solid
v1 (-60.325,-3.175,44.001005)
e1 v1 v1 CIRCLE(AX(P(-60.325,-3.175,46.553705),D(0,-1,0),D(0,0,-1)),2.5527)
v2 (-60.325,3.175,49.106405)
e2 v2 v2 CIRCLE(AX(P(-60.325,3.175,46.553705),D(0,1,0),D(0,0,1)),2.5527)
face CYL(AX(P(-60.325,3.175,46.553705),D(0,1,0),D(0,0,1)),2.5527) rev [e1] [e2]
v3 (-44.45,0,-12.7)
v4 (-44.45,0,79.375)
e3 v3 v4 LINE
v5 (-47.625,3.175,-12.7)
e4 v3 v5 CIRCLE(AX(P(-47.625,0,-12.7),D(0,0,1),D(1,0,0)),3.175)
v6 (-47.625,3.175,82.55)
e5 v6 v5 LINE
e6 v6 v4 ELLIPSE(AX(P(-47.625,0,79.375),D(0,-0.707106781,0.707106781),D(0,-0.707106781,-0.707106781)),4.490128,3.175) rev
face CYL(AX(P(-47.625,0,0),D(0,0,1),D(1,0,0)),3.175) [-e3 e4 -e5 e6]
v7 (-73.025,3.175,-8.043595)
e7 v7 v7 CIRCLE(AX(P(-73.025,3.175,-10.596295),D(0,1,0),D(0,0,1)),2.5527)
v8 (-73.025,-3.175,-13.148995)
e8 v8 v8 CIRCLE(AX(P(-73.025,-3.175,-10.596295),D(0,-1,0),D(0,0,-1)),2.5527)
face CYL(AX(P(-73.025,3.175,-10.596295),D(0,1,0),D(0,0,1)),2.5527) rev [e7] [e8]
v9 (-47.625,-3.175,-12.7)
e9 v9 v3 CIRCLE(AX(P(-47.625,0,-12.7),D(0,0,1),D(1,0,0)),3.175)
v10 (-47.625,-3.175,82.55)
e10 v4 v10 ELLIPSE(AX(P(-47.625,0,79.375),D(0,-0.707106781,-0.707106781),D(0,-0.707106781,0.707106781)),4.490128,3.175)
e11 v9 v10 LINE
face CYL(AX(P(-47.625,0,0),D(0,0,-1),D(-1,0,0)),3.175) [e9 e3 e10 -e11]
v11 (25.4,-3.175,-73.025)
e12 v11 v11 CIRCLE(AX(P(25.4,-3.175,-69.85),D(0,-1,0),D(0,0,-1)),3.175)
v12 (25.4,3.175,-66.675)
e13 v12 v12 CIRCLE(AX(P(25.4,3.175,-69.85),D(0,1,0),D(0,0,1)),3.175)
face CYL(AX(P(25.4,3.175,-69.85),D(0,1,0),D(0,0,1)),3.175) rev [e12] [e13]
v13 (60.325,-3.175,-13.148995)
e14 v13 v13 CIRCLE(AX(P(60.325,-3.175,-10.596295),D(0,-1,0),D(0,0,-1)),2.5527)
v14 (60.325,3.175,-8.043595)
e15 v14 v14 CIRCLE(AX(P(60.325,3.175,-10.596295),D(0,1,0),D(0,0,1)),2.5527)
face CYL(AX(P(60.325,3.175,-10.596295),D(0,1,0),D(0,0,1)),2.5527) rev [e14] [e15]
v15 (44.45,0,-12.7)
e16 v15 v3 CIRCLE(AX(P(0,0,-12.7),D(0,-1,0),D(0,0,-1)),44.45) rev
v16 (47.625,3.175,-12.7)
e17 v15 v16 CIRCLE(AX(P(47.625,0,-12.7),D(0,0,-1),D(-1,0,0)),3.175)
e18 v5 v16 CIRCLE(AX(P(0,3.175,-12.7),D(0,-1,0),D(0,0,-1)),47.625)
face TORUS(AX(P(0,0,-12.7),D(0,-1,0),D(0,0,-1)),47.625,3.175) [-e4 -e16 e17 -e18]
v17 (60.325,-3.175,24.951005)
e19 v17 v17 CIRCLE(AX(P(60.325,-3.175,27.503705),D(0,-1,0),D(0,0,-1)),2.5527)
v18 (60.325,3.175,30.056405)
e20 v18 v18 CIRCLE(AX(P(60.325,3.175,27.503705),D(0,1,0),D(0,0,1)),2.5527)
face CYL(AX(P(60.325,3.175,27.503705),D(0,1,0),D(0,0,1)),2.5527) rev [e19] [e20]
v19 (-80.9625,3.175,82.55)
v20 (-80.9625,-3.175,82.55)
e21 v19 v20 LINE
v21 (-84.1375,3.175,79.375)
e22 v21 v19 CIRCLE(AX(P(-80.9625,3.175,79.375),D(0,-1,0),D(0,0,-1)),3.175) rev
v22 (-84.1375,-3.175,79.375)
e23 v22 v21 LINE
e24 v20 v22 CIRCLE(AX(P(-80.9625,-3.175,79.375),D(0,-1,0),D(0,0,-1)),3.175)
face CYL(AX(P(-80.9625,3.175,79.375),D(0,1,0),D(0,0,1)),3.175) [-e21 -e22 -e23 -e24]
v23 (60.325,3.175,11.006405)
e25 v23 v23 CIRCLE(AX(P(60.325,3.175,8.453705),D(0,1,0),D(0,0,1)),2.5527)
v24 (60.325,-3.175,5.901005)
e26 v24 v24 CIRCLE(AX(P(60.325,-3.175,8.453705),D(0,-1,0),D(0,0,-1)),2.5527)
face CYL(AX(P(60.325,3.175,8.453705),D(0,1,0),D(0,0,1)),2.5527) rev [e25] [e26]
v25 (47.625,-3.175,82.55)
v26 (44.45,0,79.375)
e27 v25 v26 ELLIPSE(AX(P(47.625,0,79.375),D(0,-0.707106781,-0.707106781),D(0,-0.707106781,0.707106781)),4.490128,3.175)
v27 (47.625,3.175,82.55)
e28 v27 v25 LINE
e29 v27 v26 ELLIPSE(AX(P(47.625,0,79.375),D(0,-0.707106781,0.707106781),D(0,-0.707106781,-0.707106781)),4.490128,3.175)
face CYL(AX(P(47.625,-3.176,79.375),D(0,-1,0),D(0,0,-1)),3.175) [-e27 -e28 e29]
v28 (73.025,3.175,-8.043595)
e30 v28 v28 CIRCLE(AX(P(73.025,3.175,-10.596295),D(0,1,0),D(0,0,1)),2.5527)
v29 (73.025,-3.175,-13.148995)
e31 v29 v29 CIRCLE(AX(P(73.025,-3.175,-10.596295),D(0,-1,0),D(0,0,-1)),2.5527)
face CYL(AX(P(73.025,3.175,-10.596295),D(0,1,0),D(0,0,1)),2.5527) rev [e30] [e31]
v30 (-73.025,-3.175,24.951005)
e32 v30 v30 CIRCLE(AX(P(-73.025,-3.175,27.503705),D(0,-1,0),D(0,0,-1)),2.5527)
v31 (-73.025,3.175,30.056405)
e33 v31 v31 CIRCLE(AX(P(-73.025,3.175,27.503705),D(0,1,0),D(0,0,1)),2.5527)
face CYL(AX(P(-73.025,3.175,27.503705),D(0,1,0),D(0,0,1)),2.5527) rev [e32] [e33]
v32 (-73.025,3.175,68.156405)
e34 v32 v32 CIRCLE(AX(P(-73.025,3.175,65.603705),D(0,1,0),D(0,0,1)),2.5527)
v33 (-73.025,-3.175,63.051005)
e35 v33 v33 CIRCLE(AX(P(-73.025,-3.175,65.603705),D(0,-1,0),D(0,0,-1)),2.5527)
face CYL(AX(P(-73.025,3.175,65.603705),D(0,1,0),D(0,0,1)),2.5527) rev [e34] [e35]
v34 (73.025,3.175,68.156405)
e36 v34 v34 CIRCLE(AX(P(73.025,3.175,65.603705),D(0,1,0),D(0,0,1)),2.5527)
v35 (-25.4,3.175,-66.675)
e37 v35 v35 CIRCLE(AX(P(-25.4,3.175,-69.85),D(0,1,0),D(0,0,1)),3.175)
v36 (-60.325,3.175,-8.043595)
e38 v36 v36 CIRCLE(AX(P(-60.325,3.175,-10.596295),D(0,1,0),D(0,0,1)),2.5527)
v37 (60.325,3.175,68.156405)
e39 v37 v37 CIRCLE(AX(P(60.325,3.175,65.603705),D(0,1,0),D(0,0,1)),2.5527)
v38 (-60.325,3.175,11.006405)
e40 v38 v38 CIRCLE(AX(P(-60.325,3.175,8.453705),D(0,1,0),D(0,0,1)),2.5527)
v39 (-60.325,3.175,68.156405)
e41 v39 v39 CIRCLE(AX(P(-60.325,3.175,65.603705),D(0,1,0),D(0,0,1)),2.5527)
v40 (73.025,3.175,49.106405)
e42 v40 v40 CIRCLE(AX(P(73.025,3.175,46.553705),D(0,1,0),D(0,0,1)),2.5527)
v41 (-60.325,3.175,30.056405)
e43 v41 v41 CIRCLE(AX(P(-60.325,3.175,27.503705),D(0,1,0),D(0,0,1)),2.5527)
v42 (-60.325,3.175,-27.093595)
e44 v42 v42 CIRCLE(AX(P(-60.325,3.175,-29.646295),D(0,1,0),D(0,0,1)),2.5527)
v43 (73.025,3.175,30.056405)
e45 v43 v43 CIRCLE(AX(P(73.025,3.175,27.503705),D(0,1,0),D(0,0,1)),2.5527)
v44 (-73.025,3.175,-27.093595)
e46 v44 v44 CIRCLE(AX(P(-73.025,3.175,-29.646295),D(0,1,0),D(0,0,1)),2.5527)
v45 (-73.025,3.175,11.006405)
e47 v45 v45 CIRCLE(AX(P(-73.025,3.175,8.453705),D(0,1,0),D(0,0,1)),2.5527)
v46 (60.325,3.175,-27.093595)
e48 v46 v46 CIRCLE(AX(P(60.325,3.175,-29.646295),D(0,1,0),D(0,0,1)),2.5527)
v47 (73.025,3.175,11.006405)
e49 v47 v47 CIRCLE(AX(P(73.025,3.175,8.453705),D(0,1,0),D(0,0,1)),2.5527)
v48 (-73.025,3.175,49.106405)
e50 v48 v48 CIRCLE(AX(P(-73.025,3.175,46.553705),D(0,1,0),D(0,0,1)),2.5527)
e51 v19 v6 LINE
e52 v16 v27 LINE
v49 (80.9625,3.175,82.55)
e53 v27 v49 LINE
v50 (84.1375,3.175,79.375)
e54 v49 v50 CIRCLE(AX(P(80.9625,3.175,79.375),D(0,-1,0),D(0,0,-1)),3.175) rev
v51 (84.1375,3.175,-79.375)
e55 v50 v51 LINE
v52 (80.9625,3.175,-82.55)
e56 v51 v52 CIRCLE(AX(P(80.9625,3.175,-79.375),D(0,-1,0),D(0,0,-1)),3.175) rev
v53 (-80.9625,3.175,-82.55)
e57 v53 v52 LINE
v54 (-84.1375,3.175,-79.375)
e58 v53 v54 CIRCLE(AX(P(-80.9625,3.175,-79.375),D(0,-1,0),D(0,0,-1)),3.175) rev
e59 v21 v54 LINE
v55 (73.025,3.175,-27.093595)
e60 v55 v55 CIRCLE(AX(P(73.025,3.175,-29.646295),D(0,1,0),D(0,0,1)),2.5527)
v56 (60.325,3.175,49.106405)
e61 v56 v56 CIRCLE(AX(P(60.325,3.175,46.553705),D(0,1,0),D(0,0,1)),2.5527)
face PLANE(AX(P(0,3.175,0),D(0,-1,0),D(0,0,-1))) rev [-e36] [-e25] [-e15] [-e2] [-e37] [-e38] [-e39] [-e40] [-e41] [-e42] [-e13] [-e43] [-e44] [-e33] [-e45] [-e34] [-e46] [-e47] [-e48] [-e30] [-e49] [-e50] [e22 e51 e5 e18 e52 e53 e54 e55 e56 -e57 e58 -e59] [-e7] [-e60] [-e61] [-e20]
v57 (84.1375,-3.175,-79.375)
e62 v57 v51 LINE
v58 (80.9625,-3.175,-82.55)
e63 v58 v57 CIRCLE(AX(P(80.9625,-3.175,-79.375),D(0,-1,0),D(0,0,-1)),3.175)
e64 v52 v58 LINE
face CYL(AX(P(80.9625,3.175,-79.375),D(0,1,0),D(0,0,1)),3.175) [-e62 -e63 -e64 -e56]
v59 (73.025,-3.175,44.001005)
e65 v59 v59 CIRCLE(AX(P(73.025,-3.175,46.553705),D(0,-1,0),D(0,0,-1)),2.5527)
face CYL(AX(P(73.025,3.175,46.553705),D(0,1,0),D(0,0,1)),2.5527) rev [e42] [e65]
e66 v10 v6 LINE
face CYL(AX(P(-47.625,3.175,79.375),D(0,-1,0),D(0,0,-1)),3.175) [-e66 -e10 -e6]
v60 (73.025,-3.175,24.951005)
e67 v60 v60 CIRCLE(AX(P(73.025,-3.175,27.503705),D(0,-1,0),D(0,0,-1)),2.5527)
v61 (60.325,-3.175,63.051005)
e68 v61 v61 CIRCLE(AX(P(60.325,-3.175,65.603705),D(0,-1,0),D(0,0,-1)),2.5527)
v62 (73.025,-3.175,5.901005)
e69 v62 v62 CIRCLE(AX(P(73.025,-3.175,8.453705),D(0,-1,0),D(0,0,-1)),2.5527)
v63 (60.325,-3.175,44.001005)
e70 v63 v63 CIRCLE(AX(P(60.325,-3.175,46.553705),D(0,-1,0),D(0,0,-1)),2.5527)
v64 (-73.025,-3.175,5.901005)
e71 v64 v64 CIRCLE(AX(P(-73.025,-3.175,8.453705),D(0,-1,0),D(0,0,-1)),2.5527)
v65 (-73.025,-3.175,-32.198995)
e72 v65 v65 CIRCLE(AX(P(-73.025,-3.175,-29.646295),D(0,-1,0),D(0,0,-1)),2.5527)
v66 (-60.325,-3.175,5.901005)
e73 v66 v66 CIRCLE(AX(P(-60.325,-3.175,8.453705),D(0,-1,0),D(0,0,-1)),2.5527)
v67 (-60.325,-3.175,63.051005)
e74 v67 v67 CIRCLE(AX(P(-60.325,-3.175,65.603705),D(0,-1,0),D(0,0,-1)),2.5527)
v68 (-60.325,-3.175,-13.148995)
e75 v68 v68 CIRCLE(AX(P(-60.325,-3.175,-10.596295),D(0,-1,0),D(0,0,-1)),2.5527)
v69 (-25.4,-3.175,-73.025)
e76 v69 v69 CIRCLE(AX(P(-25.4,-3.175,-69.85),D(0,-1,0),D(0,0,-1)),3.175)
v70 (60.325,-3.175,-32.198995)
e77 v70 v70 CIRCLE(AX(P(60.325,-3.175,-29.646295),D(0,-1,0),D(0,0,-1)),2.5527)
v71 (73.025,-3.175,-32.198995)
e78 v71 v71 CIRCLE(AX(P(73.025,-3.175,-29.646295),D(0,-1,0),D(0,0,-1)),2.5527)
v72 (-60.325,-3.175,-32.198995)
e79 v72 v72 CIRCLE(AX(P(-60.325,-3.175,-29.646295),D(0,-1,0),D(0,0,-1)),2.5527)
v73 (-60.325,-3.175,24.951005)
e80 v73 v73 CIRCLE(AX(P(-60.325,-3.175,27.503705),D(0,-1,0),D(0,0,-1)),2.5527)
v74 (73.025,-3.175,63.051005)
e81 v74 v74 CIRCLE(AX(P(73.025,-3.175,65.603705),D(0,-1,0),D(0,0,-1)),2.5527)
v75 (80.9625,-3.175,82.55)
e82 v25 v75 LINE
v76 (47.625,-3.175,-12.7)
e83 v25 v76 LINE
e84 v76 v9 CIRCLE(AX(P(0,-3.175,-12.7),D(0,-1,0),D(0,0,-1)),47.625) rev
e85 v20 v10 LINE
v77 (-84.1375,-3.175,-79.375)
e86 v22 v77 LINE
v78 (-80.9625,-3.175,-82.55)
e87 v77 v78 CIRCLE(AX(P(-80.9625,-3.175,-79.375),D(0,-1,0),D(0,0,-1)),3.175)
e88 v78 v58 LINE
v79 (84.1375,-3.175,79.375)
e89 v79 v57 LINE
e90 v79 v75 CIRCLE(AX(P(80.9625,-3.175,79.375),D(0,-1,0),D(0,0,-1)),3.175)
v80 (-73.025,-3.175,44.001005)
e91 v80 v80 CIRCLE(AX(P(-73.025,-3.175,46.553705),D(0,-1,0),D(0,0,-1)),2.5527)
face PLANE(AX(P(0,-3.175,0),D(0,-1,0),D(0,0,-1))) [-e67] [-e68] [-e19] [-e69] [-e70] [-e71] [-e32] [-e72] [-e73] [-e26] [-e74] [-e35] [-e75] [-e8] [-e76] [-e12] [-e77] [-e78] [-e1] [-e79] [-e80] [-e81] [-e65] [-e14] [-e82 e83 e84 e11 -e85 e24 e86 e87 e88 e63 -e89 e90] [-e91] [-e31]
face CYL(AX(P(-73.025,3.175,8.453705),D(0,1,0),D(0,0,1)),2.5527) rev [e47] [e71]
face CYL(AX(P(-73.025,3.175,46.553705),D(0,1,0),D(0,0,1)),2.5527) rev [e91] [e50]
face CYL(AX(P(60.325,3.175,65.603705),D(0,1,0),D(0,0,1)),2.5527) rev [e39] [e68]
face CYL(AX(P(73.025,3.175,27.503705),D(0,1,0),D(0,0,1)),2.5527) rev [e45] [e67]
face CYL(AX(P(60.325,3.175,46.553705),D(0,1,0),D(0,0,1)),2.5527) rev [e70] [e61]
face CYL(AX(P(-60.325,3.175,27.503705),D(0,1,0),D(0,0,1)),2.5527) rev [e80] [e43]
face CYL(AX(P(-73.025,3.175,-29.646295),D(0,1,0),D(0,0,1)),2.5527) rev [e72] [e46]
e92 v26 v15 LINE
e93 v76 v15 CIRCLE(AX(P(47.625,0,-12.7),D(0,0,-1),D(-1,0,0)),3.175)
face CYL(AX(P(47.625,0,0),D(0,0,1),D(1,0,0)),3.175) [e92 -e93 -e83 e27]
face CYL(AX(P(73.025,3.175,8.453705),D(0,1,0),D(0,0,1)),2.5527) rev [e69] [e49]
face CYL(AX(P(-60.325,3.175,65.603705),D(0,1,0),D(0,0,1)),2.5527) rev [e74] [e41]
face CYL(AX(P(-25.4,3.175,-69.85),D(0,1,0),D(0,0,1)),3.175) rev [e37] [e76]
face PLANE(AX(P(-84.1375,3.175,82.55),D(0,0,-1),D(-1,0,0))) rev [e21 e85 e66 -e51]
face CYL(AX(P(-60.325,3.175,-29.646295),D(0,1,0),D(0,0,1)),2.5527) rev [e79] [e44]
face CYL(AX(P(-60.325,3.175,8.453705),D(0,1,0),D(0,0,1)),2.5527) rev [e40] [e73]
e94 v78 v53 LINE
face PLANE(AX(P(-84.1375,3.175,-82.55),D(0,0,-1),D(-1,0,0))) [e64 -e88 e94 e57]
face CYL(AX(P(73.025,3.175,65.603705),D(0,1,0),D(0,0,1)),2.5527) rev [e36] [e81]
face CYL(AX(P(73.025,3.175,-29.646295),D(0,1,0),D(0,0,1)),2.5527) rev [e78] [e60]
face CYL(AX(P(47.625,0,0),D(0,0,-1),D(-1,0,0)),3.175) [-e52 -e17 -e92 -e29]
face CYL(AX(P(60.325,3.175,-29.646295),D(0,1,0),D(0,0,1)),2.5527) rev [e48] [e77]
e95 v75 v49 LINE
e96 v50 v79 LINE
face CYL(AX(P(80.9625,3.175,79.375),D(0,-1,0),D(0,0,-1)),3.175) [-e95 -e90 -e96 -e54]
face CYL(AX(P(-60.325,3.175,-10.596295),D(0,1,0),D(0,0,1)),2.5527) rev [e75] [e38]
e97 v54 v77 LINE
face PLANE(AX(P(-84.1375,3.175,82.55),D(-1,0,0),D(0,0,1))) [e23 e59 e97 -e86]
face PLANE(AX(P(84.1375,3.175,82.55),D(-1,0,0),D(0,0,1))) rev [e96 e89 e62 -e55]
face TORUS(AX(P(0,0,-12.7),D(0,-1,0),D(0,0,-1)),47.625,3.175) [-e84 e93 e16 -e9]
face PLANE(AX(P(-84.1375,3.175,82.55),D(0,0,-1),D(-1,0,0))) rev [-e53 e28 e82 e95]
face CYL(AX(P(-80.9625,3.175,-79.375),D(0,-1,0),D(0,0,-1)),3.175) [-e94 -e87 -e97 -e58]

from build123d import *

# Parameters (mm, degrees)
SKETCH1_W                        = 168.275
SKETCH1_H                        = 165.1
BOSS_EXTRUDE1_DEPTH              = 3.175
CUT_EXTRUDE1_REACH               = 120.042
SKETCH2_R                        = 44.45
F_1_4_0_25_DIAMETER_HOLE1_D      = 6.35
F_1_4_0_25_DIAMETER_HOLE1_DEPTH  = 25.4
F_1_4_0_25_DIAMETER_HOLE1_TIP    = 1.907732465
F_1_4_20_TAPPED_HOLE1_AT_2_COUNT = 2
F_1_4_20_TAPPED_HOLE1_AT_2_PITCH = 12.7
LPATTERN1_COUNT                  = 6
LPATTERN1_PITCH                  = 19.05
FILLET1_R                        = 3.175
FILLET2_R                        = 3.175


with BuildPart() as part:
    # Sketch1 → Boss-Extrude1 (new, symmetric)
    with BuildSketch(Plane(origin=(0, 0, 0), x_dir=(1, 0, 0), z_dir=(0, 1, 0))):
        Rectangle(SKETCH1_W, SKETCH1_H)
    extrude(amount=BOSS_EXTRUDE1_DEPTH, both=True)

    # Sketch2 → Cut-Extrude1 (cut, up to next)
    with BuildSketch(Plane(origin=(0, 3.175, 0), x_dir=(1, 0, 0), z_dir=(0, 1, 0)), mode=Mode.PRIVATE) as cut_extrude1_sk1:
        with Locations((0, 12.7)):
            Circle(SKETCH2_R)
    cut_extrude1_tool1 = extrude(cut_extrude1_sk1.sketch, amount=-CUT_EXTRUDE1_REACH, mode=Mode.PRIVATE) & part.part
    # Sketch2 → Cut-Extrude1 (cut, up to next)
    with BuildSketch(Plane(origin=(0, 3.175, 0), x_dir=(1, 0, 0), z_dir=(0, 1, 0)), mode=Mode.PRIVATE) as cut_extrude1_sk2:
        with BuildLine():
            Line((44.45, -82.55), (44.45, 12.7))
            ThreePointArc((44.45, 12.7), (0, -31.75), (-44.45, 12.7))
            Line((-44.45, 12.7), (-44.45, -82.55))
            Line((-44.45, -82.55), (44.45, -82.55))
        make_face()
    cut_extrude1_tool2 = extrude(cut_extrude1_sk2.sketch, amount=-CUT_EXTRUDE1_REACH, mode=Mode.PRIVATE) & part.part
    add(cut_extrude1_tool1.solids().sort_by_distance((0, 3.175, -12.7))[0], mode=Mode.SUBTRACT)
    add(cut_extrude1_tool2.solids().sort_by_distance((0, 3.175, 51.564855))[0], mode=Mode.SUBTRACT)

    # 1/4 (0.25) Diameter Hole1
    with Locations(Plane(origin=(0, 3.175, 0), x_dir=(1, 0, 0), z_dir=(0, 1, 0))):
        with Locations((-25.4, 69.85), (25.4, 69.85)):
            Hole(F_1_4_0_25_DIAMETER_HOLE1_D / 2, depth=F_1_4_0_25_DIAMETER_HOLE1_DEPTH)
            with Locations((0, 0, -(F_1_4_0_25_DIAMETER_HOLE1_DEPTH + F_1_4_0_25_DIAMETER_HOLE1_TIP / 2))):  # 118° drill point
                Cone(0, F_1_4_0_25_DIAMETER_HOLE1_D / 2, F_1_4_0_25_DIAMETER_HOLE1_TIP, mode=Mode.SUBTRACT)

    # Sketch10 → 1/4-20 Tapped Hole1 (revolve, cut)
    with BuildSketch(Plane(origin=(-73.025, 3.175, 65.603705108), x_dir=(0, 0, 1), z_dir=(1, 0, 0))):
        Polygon((0, 0), (0, 26.933816902), (2.5527, 25.4), (2.5527, 0), align=None)
    f_1_4_20_tapped_hole1 = revolve(axis=Axis((-73.025, 9.525, 65.603705108), (0, -1, 0)), mode=Mode.SUBTRACT)

    # 1/4-20 Tapped Hole1 at 2: 1/4-20 Tapped Hole1 ×2
    with Locations(*[(i * F_1_4_20_TAPPED_HOLE1_AT_2_PITCH, 0, 0) for i in range(1, F_1_4_20_TAPPED_HOLE1_AT_2_COUNT)]):
        add(f_1_4_20_tapped_hole1, mode=Mode.SUBTRACT)

    # LPattern1: 1/4-20 Tapped Hole1 ×6
    with Locations(*[(0, 0, -i * LPATTERN1_PITCH) for i in range(1, LPATTERN1_COUNT)]):
        add(f_1_4_20_tapped_hole1, mode=Mode.SUBTRACT)

    # LPattern1 copy 1 sketch → LPattern1 copy 1 (revolve, cut)
    with BuildSketch(Plane(origin=(-60.325, 3.175, 46.553705108), x_dir=(0, 0, 1), z_dir=(1, 0, 0))):
        Polygon((0, 0), (0, 26.933816902), (2.5527, 25.4), (2.5527, 0), align=None)
    revolve(axis=Axis((-60.325, 9.525, 46.553705108), (0, -1, 0)), mode=Mode.SUBTRACT)

    # LPattern1 copy 2 sketch → LPattern1 copy 2 (revolve, cut)
    with BuildSketch(Plane(origin=(-60.325, 3.175, 27.503705108), x_dir=(0, 0, 1), z_dir=(1, 0, 0))):
        Polygon((0, 0), (0, 26.933816902), (2.5527, 25.4), (2.5527, 0), align=None)
    revolve(axis=Axis((-60.325, 9.525, 27.503705108), (0, -1, 0)), mode=Mode.SUBTRACT)

    # LPattern1 copy 3 sketch → LPattern1 copy 3 (revolve, cut)
    with BuildSketch(Plane(origin=(-60.325, 3.175, 8.453705108), x_dir=(0, 0, 1), z_dir=(1, 0, 0))):
        Polygon((0, 0), (0, 26.933816902), (2.5527, 25.4), (2.5527, 0), align=None)
    revolve(axis=Axis((-60.325, 9.525, 8.453705108), (0, -1, 0)), mode=Mode.SUBTRACT)

    # LPattern1 copy 4 sketch → LPattern1 copy 4 (revolve, cut)
    with BuildSketch(Plane(origin=(-60.325, 3.175, -10.596294892), x_dir=(0, 0, 1), z_dir=(1, 0, 0))):
        Polygon((0, 0), (0, 26.933816902), (2.5527, 25.4), (2.5527, 0), align=None)
    revolve(axis=Axis((-60.325, 9.525, -10.596294892), (0, -1, 0)), mode=Mode.SUBTRACT)

    # LPattern1 copy 5 sketch → LPattern1 copy 5 (revolve, cut)
    with BuildSketch(Plane(origin=(-60.325, 3.175, -29.646294892), x_dir=(0, 0, 1), z_dir=(1, 0, 0))):
        Polygon((0, 0), (0, 26.933816902), (2.5527, 25.4), (2.5527, 0), align=None)
    revolve(axis=Axis((-60.325, 9.525, -29.646294892), (0, -1, 0)), mode=Mode.SUBTRACT)

    # Mirror1: 1/4-20 Tapped Hole1 across plane
    add(f_1_4_20_tapped_hole1.mirror(Plane(origin=(0, 0, 0), x_dir=(0, 0, 1), z_dir=(1, 0, 0))), mode=Mode.SUBTRACT)

    # Mirror1 copy 1 sketch → Mirror1 copy 1 (revolve, cut)
    with BuildSketch(Plane(origin=(60.325, 3.175, 65.603705108), x_dir=(0, 0, 1), z_dir=(-1, 0, 0))):
        Polygon((0, 0), (0, -26.933816902), (2.5527, -25.4), (2.5527, 0), align=None)
    revolve(axis=Axis((60.325, 9.525, 65.603705108), (0, 1, 0)), mode=Mode.SUBTRACT)

    # Mirror1 copy 2 sketch → Mirror1 copy 2 (revolve, cut)
    with BuildSketch(Plane(origin=(73.025, 3.175, 46.553705108), x_dir=(0, 0, 1), z_dir=(-1, 0, 0))):
        Polygon((0, 0), (0, -26.933816902), (2.5527, -25.4), (2.5527, 0), align=None)
    revolve(axis=Axis((73.025, 9.525, 46.553705108), (0, 1, 0)), mode=Mode.SUBTRACT)

    # Mirror1 copy 3 sketch → Mirror1 copy 3 (revolve, cut)
    with BuildSketch(Plane(origin=(73.025, 3.175, 27.503705108), x_dir=(0, 0, 1), z_dir=(-1, 0, 0))):
        Polygon((0, 0), (0, -26.933816902), (2.5527, -25.4), (2.5527, 0), align=None)
    revolve(axis=Axis((73.025, 9.525, 27.503705108), (0, 1, 0)), mode=Mode.SUBTRACT)

    # Mirror1 copy 4 sketch → Mirror1 copy 4 (revolve, cut)
    with BuildSketch(Plane(origin=(73.025, 3.175, 8.453705108), x_dir=(0, 0, 1), z_dir=(-1, 0, 0))):
        Polygon((0, 0), (0, -26.933816902), (2.5527, -25.4), (2.5527, 0), align=None)
    revolve(axis=Axis((73.025, 9.525, 8.453705108), (0, 1, 0)), mode=Mode.SUBTRACT)

    # Mirror1 copy 5 sketch → Mirror1 copy 5 (revolve, cut)
    with BuildSketch(Plane(origin=(73.025, 3.175, -10.596294892), x_dir=(0, 0, 1), z_dir=(-1, 0, 0))):
        Polygon((0, 0), (0, -26.933816902), (2.5527, -25.4), (2.5527, 0), align=None)
    revolve(axis=Axis((73.025, 9.525, -10.596294892), (0, 1, 0)), mode=Mode.SUBTRACT)

    # Mirror1 copy 6 sketch → Mirror1 copy 6 (revolve, cut)
    with BuildSketch(Plane(origin=(73.025, 3.175, -29.646294892), x_dir=(0, 0, 1), z_dir=(-1, 0, 0))):
        Polygon((0, 0), (0, -26.933816902), (2.5527, -25.4), (2.5527, 0), align=None)
    revolve(axis=Axis((73.025, 9.525, -29.646294892), (0, 1, 0)), mode=Mode.SUBTRACT)

    # Mirror1 copy 7 sketch → Mirror1 copy 7 (revolve, cut)
    with BuildSketch(Plane(origin=(60.325, 3.175, 46.553705108), x_dir=(0, 0, 1), z_dir=(-1, 0, 0))):
        Polygon((0, 0), (0, -26.933816902), (2.5527, -25.4), (2.5527, 0), align=None)
    revolve(axis=Axis((60.325, 9.525, 46.553705108), (0, 1, 0)), mode=Mode.SUBTRACT)

    # Mirror1 copy 8 sketch → Mirror1 copy 8 (revolve, cut)
    with BuildSketch(Plane(origin=(60.325, 3.175, 27.503705108), x_dir=(0, 0, 1), z_dir=(-1, 0, 0))):
        Polygon((0, 0), (0, -26.933816902), (2.5527, -25.4), (2.5527, 0), align=None)
    revolve(axis=Axis((60.325, 9.525, 27.503705108), (0, 1, 0)), mode=Mode.SUBTRACT)

    # Mirror1 copy 9 sketch → Mirror1 copy 9 (revolve, cut)
    with BuildSketch(Plane(origin=(60.325, 3.175, 8.453705108), x_dir=(0, 0, 1), z_dir=(-1, 0, 0))):
        Polygon((0, 0), (0, -26.933816902), (2.5527, -25.4), (2.5527, 0), align=None)
    revolve(axis=Axis((60.325, 9.525, 8.453705108), (0, 1, 0)), mode=Mode.SUBTRACT)

    # Mirror1 copy 10 sketch → Mirror1 copy 10 (revolve, cut)
    with BuildSketch(Plane(origin=(60.325, 3.175, -10.596294892), x_dir=(0, 0, 1), z_dir=(-1, 0, 0))):
        Polygon((0, 0), (0, -26.933816902), (2.5527, -25.4), (2.5527, 0), align=None)
    revolve(axis=Axis((60.325, 9.525, -10.596294892), (0, 1, 0)), mode=Mode.SUBTRACT)

    # Mirror1 copy 11 sketch → Mirror1 copy 11 (revolve, cut)
    with BuildSketch(Plane(origin=(60.325, 3.175, -29.646294892), x_dir=(0, 0, 1), z_dir=(-1, 0, 0))):
        Polygon((0, 0), (0, -26.933816902), (2.5527, -25.4), (2.5527, 0), align=None)
    revolve(axis=Axis((60.325, 9.525, -29.646294892), (0, 1, 0)), mode=Mode.SUBTRACT)

    # Fillet1
    fillet1_edges = [part.edges().sort_by_distance(p)[0] for p in [
        (-44.45, -3.175, 34.925),
        (0, -3.175, -57.15),
        (-44.45, 3.175, 34.925),
        (0, 3.175, -57.15),
        (44.45, -3.175, 34.925),
        (44.45, 3.175, 34.925),
        (84.1375, 0, 82.55),
        (44.45, 0, 82.55),
        (-84.1375, 0, 82.55),
        (-44.45, 0, 82.55),
    ]]
    fillet(fillet1_edges, radius=FILLET1_R - 0.0001)  # a hair under: the kernel refuses the full size

    # Fillet2
    fillet2_edges = [part.edges().sort_by_distance(p)[0] for p in [
        (84.1375, 0, -82.55),
        (-84.1375, 0, -82.55),
    ]]
    fillet(fillet2_edges, radius=FILLET2_R)


solid = part.part
